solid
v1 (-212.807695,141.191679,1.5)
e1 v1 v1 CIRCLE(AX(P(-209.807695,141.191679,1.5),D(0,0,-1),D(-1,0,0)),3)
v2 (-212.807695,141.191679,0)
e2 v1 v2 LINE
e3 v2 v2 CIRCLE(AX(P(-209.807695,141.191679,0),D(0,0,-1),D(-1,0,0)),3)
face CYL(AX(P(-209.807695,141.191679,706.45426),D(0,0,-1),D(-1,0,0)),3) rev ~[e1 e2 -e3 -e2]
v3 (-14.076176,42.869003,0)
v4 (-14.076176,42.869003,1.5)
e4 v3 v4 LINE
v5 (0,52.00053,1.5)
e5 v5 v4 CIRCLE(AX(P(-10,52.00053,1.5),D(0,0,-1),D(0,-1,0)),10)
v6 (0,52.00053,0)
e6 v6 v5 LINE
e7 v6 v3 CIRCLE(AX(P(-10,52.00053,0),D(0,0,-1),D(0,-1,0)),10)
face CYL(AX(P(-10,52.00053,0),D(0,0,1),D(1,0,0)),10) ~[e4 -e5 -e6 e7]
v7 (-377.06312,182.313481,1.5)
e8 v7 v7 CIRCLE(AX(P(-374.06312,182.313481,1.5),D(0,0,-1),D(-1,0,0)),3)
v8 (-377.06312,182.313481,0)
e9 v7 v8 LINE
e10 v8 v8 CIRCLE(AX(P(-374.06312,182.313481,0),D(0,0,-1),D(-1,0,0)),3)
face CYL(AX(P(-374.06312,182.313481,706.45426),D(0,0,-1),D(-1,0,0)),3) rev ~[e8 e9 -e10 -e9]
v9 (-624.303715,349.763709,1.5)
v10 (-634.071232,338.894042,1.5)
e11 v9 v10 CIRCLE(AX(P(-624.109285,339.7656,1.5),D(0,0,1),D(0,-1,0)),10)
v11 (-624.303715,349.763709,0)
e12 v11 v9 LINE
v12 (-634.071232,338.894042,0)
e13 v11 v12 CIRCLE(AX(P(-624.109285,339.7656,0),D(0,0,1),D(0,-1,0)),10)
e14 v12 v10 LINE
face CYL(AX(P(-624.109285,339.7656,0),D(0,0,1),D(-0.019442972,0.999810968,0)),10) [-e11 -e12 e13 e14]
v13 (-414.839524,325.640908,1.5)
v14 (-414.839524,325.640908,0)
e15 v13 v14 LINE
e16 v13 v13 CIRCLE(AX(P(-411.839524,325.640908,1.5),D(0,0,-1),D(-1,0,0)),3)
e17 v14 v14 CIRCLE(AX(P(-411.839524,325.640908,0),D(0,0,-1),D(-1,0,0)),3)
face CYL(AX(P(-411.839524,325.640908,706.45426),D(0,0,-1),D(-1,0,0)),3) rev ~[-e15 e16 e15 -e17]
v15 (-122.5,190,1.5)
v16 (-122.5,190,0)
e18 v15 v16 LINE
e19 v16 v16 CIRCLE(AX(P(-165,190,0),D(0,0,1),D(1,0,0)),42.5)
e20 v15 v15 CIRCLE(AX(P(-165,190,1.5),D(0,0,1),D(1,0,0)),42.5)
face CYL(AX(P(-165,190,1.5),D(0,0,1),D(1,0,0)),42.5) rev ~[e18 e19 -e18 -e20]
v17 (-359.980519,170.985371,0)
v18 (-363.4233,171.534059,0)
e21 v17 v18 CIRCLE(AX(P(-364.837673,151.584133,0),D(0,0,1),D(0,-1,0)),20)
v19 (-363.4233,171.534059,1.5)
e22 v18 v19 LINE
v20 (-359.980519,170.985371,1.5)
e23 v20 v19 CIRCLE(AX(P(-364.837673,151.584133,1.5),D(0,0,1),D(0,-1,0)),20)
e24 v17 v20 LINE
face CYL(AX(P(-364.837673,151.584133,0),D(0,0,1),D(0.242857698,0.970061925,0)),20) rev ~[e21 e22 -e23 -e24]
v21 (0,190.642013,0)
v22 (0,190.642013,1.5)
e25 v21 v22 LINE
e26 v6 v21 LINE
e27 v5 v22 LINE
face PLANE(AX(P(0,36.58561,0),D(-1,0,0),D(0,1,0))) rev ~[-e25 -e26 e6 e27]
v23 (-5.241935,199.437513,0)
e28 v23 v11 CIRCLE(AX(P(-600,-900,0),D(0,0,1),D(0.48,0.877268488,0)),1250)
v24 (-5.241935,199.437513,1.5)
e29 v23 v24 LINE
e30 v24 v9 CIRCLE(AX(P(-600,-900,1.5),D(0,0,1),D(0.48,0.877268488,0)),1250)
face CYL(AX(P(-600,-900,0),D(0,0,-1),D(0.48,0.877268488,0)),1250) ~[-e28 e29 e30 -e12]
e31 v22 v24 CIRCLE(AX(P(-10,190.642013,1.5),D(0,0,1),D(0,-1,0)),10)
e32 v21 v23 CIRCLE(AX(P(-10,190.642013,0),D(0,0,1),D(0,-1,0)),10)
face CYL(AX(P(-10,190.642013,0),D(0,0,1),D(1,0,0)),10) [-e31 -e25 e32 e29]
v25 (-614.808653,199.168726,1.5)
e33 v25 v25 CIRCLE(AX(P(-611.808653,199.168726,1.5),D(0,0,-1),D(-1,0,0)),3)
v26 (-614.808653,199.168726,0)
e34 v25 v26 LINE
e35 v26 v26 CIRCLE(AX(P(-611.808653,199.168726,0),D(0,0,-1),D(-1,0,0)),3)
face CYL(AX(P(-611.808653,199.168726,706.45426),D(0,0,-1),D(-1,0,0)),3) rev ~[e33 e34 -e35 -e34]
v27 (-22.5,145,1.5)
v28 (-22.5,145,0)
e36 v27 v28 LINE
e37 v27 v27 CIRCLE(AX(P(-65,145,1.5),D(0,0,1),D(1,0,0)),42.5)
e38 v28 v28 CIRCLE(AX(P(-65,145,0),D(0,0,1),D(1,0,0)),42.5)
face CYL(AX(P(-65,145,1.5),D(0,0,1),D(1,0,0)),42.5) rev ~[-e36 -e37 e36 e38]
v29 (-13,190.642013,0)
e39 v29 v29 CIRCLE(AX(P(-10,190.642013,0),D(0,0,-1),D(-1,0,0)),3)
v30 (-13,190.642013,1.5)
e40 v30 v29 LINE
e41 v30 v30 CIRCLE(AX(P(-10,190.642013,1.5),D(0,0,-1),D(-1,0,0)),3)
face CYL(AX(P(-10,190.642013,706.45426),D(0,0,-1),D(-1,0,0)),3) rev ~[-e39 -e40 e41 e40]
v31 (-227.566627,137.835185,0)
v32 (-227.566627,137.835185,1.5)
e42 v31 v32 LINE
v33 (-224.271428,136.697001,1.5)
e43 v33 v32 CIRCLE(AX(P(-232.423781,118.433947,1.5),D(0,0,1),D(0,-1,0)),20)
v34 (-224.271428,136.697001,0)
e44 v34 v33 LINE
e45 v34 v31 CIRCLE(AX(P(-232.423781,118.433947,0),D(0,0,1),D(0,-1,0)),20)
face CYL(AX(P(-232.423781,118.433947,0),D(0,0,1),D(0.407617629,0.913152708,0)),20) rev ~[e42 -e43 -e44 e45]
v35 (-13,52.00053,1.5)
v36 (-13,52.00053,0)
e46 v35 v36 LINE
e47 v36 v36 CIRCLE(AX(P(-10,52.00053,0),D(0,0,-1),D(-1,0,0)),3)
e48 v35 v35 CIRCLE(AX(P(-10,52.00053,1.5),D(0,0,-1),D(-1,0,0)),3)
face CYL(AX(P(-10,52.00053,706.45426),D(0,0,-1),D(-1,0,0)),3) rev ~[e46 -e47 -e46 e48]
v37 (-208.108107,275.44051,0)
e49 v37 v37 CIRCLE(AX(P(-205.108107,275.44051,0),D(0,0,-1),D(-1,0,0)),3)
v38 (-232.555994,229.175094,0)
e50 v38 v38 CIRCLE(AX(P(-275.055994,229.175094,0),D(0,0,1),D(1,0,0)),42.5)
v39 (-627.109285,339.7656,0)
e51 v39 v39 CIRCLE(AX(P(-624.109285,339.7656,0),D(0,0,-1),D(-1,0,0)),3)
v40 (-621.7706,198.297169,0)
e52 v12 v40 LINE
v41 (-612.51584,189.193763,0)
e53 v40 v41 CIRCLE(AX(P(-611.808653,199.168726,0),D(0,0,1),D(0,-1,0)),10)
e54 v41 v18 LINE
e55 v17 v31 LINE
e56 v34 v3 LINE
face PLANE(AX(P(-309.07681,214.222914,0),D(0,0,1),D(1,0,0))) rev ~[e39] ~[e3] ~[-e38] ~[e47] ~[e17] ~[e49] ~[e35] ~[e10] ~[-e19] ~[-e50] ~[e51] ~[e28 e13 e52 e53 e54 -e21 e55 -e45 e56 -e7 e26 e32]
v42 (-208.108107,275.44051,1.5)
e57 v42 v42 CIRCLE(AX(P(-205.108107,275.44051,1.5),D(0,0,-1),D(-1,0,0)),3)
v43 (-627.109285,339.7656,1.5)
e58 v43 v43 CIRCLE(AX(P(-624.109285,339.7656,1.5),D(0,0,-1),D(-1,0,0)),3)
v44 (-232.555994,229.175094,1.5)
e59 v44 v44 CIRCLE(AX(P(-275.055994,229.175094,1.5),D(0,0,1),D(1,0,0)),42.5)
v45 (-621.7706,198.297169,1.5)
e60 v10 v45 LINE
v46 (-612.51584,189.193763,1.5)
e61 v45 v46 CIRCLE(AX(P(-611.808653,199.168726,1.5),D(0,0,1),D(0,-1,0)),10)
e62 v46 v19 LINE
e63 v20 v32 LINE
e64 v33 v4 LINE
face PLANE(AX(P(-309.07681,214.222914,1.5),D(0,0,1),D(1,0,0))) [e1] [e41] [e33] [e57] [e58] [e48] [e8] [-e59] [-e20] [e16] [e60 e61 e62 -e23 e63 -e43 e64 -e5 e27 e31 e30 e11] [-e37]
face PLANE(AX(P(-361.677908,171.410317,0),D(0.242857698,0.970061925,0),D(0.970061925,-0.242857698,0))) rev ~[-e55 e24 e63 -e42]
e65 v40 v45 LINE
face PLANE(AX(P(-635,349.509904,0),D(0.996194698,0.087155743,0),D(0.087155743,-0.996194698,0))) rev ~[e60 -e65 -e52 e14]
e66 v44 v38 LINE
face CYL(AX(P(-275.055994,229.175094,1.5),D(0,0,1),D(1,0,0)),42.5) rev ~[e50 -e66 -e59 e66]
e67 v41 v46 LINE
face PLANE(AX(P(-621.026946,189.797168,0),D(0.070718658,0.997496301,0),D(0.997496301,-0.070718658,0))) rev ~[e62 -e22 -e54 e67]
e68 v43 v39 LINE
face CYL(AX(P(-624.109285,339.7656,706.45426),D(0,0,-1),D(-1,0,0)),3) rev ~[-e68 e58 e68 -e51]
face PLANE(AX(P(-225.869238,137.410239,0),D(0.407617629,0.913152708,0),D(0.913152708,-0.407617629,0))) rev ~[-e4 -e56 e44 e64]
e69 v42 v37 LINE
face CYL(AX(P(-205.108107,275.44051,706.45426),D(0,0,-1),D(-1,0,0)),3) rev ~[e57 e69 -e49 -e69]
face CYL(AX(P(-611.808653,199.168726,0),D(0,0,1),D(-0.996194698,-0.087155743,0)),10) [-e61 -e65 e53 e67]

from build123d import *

# Parameters (mm, degrees)
F1_DEPTH = 1.5
F2_R     = 42.5
F3_DEPTH = 1.501
F4_R     = 10
F5_R     = 20
F7_D     = 6


with BuildPart() as f1:
    # F0 (on Top) → F1 (new body)
    with BuildSketch(Plane.XY):
        with BuildLine():
            Line((0, 36.5856099731), (0, 196.5856099731))
            ThreePointArc((0, 196.5856099731), (-307.3351576975, 315.2560594706), (-635, 349.5099039223))
            Line((-635, 349.5099039223), (-621.0269461922, 189.7971680702))
            Line((-621.0269461922, 189.7971680702), (-361.6779078132, 171.4103170113))
            Line((-361.6779078132, 171.4103170113), (-225.8692382849, 137.4102393502))
            Line((-225.8692382849, 137.4102393502), (0, 36.5856099731))
        make_face()
    extrude(amount=F1_DEPTH)

    # F2 (on face) → F3 (cut, through all)
    with BuildSketch(Plane.XY.offset(1.5)):
        with Locations((-275.0559937421, 229.17509395)):
            Circle(F2_R)
        with Locations((-165, 190)):
            Circle(F2_R)
        with Locations((-65, 145)):
            Circle(F2_R)
    extrude(amount=-F3_DEPTH, mode=Mode.SUBTRACT)

    # F4
    f4_edges = [f1.edges().sort_by_distance(p)[0] for p in [
        (0, 196.58561, 0.75),
        (-635, 349.509904, 0.75),
        (-621.026946, 189.797168, 0.75),
        (0, 36.58561, 0.75),
    ]]
    fillet(f4_edges, radius=F4_R)

    # F5
    f5_edges = [f1.edges().sort_by_distance(p)[0] for p in [
        (-361.677908, 171.410317, 0.75),
        (-225.869238, 137.410239, 0.75),
    ]]
    fillet(f5_edges, radius=F5_R)

    # F7 (through all)
    with Locations(Plane.XY.offset(1.5)):
        with Locations((-624.1092854766, 339.7655997622), (-611.8086529213, 199.1687262985), (-411.8395238612, 325.6409079413), (-374.0631195885, 182.3134808013), (-205.1081070963, 275.4405101573), (-209.8076952351, 141.1916790514), (-10, 190.6420127613), (-10, 52.0005303507)):
            Hole(F7_D / 2)


solid = f1.part
